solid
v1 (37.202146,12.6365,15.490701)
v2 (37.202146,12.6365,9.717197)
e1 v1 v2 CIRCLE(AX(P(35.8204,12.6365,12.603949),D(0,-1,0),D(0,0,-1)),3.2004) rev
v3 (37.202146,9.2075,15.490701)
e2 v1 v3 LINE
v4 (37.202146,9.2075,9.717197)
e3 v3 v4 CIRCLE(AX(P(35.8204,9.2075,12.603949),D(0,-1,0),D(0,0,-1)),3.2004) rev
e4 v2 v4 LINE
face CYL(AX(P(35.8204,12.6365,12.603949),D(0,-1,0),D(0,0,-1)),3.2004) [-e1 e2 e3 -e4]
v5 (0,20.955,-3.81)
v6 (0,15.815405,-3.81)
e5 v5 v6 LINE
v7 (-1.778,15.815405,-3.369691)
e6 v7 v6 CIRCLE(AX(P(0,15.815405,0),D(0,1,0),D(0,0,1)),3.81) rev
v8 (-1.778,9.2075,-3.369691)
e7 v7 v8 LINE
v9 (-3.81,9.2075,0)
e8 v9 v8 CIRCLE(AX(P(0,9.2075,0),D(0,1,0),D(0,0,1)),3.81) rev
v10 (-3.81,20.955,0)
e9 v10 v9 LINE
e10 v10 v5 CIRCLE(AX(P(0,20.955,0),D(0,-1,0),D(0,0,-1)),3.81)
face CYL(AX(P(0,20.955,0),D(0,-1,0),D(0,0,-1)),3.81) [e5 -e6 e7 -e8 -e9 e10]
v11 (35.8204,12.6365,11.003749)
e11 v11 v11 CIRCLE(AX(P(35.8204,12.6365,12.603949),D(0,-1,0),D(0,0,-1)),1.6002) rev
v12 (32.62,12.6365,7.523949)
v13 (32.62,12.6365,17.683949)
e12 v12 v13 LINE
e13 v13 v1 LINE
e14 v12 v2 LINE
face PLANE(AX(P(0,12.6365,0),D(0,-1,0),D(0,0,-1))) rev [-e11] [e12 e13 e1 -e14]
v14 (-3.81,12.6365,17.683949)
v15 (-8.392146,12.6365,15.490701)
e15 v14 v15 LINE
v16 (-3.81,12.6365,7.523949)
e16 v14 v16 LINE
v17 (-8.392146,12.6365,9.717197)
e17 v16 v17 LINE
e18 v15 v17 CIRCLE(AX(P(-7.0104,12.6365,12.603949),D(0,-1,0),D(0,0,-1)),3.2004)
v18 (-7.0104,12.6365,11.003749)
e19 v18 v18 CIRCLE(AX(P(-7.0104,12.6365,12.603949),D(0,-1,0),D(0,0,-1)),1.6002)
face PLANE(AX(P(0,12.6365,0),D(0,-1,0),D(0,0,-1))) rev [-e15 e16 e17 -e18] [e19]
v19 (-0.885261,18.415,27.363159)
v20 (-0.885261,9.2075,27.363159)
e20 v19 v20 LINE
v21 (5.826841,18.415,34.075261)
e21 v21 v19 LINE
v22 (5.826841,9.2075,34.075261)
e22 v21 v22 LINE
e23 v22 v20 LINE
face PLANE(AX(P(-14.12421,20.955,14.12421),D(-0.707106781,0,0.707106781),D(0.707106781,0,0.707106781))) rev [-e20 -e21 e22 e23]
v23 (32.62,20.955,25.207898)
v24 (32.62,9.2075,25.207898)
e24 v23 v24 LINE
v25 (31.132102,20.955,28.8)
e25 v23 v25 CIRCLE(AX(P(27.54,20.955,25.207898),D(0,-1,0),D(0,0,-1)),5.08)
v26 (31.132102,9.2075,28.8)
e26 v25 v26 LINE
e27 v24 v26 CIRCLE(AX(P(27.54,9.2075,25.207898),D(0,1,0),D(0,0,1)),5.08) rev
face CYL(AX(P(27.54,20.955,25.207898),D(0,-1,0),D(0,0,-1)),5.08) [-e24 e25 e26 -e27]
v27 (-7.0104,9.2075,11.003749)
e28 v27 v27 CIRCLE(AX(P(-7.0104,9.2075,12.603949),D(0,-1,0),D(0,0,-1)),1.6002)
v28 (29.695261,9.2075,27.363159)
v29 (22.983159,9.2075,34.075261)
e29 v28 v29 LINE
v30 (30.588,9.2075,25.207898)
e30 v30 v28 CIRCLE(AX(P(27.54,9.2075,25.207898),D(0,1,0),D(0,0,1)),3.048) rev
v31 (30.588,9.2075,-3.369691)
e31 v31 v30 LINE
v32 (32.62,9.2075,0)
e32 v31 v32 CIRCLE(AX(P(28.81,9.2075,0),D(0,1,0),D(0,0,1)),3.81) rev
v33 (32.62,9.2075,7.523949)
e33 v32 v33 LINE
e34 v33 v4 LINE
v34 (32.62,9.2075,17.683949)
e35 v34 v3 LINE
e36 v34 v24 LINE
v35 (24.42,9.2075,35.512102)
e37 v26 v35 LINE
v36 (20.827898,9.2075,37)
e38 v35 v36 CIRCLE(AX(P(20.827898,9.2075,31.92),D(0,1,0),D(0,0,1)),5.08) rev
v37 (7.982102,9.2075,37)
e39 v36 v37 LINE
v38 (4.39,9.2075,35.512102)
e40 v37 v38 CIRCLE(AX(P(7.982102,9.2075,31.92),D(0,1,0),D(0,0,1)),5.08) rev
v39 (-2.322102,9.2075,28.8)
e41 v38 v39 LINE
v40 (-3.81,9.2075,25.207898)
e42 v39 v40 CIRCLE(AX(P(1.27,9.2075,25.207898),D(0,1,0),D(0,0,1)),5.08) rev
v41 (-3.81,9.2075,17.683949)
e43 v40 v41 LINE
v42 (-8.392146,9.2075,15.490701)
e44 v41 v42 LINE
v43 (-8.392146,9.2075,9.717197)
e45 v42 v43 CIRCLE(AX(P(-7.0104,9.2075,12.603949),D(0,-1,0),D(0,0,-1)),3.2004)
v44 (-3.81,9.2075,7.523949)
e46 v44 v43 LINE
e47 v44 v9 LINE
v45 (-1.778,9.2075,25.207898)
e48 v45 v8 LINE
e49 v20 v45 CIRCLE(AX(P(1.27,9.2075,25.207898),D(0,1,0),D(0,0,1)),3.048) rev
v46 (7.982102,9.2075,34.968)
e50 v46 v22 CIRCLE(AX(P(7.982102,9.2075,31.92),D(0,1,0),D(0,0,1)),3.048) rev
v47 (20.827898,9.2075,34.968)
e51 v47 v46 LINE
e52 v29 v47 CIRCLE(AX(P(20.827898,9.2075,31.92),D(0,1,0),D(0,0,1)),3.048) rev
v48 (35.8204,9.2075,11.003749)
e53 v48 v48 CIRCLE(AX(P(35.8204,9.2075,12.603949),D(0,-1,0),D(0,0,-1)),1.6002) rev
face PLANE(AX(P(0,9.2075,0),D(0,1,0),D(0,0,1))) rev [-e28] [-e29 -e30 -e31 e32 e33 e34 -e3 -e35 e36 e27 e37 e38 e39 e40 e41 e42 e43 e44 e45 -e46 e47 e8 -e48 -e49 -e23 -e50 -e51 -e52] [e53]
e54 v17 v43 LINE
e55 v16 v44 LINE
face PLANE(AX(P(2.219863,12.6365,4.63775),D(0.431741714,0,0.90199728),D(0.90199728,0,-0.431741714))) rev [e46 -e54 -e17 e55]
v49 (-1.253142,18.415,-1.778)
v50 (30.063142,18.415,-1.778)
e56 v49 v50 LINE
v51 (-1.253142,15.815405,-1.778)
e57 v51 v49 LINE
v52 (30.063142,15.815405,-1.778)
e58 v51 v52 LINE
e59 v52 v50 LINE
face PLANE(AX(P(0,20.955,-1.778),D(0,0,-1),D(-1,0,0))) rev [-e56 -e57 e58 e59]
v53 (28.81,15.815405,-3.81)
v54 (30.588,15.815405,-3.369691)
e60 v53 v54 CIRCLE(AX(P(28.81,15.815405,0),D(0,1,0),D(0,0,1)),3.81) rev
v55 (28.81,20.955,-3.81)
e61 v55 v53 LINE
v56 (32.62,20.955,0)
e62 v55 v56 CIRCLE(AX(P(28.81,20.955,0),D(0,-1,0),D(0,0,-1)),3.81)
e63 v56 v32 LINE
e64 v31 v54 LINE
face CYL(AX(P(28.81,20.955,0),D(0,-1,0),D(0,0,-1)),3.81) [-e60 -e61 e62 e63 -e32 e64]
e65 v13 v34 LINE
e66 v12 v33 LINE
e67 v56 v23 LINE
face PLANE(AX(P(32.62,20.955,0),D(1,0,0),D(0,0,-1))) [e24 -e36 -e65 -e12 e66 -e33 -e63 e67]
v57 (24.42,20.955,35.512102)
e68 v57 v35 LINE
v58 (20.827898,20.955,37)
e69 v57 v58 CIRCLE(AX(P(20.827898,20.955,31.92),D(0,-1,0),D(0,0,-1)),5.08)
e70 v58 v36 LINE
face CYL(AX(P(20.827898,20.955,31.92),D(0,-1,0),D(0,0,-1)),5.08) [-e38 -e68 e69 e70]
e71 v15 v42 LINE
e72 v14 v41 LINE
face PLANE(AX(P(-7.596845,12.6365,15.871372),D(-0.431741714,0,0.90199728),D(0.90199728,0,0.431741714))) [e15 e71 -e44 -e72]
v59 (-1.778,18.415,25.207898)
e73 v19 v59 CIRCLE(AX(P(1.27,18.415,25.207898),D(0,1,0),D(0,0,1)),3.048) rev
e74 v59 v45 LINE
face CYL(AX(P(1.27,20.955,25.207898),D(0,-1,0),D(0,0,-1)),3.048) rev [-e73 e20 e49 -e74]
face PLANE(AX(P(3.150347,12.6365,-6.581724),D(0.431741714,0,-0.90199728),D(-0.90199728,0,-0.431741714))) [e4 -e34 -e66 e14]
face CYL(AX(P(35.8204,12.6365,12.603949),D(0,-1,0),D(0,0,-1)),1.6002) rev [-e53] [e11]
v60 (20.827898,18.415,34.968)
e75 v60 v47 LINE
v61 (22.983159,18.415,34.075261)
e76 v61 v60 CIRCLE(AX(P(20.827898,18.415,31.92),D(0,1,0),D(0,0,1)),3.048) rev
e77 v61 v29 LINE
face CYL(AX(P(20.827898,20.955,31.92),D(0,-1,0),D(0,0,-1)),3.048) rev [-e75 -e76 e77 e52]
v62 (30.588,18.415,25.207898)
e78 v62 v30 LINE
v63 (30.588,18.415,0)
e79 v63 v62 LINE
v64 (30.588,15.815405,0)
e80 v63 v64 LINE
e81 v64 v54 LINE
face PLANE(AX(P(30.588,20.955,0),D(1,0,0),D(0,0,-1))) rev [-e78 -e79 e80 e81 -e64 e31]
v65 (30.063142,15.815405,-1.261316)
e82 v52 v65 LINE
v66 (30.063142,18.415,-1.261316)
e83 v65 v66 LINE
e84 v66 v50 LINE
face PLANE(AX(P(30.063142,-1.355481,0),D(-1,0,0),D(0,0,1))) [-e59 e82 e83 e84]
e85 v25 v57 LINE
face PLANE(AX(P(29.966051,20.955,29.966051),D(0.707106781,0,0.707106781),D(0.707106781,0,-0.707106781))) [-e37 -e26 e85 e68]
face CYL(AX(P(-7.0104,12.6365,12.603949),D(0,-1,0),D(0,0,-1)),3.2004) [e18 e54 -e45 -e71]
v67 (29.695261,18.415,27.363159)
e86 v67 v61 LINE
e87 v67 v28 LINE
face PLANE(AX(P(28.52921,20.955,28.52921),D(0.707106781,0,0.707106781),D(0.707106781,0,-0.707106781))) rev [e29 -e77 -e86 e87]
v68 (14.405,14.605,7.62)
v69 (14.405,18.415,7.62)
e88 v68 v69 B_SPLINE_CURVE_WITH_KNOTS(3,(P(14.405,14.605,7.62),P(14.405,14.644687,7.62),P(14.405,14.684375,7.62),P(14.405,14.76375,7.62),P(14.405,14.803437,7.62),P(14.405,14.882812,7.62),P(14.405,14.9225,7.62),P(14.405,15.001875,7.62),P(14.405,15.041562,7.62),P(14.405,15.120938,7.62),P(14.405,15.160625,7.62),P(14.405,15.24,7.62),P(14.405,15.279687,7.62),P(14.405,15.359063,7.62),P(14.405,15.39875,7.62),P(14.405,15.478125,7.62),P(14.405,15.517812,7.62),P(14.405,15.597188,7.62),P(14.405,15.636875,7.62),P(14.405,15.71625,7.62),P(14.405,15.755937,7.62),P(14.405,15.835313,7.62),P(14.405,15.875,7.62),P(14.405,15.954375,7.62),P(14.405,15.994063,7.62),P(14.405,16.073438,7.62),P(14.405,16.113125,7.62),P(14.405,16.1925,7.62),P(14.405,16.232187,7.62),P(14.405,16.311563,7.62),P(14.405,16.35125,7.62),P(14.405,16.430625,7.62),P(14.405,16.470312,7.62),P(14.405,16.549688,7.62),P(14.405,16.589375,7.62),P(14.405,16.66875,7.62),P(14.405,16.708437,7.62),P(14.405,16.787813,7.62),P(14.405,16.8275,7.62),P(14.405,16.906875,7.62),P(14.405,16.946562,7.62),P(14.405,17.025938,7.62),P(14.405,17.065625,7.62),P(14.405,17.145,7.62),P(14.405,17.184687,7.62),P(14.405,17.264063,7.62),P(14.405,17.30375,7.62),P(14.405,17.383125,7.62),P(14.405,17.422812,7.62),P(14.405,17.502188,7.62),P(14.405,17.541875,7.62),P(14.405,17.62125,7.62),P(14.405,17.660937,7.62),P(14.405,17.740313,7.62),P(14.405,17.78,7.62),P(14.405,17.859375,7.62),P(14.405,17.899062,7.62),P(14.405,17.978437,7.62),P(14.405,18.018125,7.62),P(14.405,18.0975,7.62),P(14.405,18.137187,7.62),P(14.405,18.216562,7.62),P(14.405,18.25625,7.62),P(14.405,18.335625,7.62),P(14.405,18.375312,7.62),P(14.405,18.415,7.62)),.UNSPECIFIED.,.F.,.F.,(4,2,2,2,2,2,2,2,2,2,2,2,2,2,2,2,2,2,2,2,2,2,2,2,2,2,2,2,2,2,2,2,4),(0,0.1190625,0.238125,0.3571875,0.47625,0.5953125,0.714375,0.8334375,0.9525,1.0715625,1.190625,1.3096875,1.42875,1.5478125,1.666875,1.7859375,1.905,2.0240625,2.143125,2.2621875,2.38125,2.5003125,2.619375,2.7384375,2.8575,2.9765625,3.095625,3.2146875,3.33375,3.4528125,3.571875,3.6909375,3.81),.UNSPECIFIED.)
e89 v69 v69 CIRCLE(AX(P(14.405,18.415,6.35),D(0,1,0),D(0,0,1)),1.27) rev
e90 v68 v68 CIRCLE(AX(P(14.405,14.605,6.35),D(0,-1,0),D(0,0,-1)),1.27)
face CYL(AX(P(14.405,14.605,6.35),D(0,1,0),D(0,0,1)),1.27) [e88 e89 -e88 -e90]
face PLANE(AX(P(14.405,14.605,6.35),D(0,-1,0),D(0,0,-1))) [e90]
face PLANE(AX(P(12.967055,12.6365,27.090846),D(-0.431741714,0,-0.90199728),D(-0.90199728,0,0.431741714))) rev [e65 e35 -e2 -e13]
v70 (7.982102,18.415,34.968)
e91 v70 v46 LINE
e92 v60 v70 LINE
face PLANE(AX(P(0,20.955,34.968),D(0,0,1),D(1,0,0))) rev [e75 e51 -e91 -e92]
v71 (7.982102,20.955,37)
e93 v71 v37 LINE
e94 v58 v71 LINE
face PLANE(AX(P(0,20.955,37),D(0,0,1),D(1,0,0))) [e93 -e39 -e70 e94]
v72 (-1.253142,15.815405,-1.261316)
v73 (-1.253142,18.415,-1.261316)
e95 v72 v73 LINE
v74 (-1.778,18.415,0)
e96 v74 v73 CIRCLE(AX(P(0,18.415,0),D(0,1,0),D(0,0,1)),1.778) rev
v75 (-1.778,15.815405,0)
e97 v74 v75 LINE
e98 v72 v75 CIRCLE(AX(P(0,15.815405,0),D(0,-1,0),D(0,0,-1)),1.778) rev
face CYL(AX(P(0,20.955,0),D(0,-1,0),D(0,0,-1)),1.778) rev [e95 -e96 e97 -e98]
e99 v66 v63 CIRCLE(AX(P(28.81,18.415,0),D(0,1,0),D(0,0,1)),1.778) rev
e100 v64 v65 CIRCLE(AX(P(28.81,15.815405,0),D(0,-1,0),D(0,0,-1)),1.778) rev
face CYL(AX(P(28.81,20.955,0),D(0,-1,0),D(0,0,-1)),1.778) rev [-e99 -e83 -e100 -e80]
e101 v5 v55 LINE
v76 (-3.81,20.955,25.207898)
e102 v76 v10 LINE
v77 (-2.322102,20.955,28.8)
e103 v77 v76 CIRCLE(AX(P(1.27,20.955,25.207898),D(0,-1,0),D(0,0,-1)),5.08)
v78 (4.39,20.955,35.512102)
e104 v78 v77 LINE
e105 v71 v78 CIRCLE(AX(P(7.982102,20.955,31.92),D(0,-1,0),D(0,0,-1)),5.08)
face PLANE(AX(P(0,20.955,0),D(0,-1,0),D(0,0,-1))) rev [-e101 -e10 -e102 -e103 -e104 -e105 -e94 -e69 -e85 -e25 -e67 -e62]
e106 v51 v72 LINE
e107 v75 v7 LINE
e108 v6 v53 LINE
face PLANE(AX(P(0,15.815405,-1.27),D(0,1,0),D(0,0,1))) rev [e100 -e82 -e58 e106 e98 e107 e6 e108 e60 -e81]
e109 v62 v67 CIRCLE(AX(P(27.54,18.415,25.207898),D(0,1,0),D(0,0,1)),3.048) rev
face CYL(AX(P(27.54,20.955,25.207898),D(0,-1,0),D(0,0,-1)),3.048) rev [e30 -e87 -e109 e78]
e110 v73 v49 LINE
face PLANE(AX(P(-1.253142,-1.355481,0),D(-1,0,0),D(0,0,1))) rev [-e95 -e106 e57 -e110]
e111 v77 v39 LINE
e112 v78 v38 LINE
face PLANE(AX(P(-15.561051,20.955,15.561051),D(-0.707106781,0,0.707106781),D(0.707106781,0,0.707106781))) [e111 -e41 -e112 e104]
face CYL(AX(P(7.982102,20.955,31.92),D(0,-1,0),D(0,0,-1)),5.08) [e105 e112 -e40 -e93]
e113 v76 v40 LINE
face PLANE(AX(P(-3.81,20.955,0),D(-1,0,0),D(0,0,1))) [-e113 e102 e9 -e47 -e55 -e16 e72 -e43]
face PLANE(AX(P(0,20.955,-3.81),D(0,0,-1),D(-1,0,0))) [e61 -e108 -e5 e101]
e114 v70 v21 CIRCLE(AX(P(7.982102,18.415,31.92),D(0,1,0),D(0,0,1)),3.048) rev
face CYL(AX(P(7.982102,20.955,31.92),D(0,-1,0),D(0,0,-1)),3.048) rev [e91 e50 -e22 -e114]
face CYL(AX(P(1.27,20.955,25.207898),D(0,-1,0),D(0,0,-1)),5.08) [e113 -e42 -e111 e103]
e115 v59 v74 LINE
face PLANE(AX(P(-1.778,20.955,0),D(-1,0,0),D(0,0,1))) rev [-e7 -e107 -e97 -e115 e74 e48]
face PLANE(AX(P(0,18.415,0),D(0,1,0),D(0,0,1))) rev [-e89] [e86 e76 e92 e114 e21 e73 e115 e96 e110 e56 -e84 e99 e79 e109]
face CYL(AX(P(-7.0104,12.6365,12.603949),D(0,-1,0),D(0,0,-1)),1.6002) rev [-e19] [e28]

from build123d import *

# Parameters (mm, degrees)
BOSS_EXTRUDE1_DEPTH     = 2.54
BOSS_EXTRUDE2_START     = -23.495
BOSS_EXTRUDE2_DEPTH     = 23.495
CUT_EXTRUDE2_DEPTH      = 20.955
BOSS_EXTRUDE3_DEPTH     = 2.54
SKETCH11_R              = 1.27
BOSS_EXTRUDE4_DEPTH     = 2.54
CUT_EXTRUDE3_DEPTH      = 2.54
CUT_EXTRUDE4_DEPTH      = 2.54
CUT_EXTRUDE4_DEPTH_BACK = 2.54
SKETCH15_W              = 0.800537806
SKETCH15_H              = 10.431424645
SPLIT1_START            = -2.54
SPLIT1_DEPTH            = 11.7475
SKETCH16_R              = 3.2004
SKETCH16_R_2            = 1.6002
SKETCH16_R_3            = 1.27
BOSS_EXTRUDE5_DEPTH     = 3.429
SKETCH21_R              = 1.27
BOSS_EXTRUDE6_DEPTH     = 3.81


# Read off the part's stored shape, not the designer's step: Split1
with BuildPart() as part:
    # Sketch1 → Boss-Extrude1 (new body)
    # profile 1 of 2: a face of its own
    with BuildSketch(Plane(origin=(0, 0, 0), x_dir=(1, 0, 0), z_dir=(0, 1, 0))):
        with BuildLine():
            Line((-1.778, 0), (-1.778, -25.207897552))
            ThreePointArc((-1.778, -25.207897552), (-1.545984815, -26.374316653), (-0.885261469, -27.363159021))
            Line((-0.885261469, -27.363159021), (5.826840979, -34.075261469))
            ThreePointArc((5.826840979, -34.075261469), (6.815683347, -34.735984815), (7.982102448, -34.968))
            Line((7.982102448, -34.968), (20.827897552, -34.968))
            ThreePointArc((20.827897552, -34.968), (21.994316653, -34.735984815), (22.983159021, -34.075261469))
            Line((22.983159021, -34.075261469), (29.695261469, -27.363159021))
            ThreePointArc((29.695261469, -27.363159021), (30.355984815, -26.374316653), (30.588, -25.207897552))
            Line((30.588, -25.207897552), (30.588, 0))
            ThreePointArc((30.588, 0), (30.067235857, 1.257235857), (28.81, 1.778))
            Line((28.81, 1.778), (0, 1.778))
            ThreePointArc((0, 1.778), (-1.257235857, 1.257235857), (-1.778, 0))
        make_face()
        with BuildLine():
            ThreePointArc((0, 1.27), (-0.898025612, 0.898025612), (-1.27, 0))
            Line((-1.27, 0), (-1.27, -25.207897552))
            ThreePointArc((-1.27, -25.207897552), (-1.076654013, -26.17991347), (-0.526051224, -27.003948776))
            Line((-0.526051224, -27.003948776), (6.186051224, -33.716051224))
            ThreePointArc((6.186051224, -33.716051224), (7.01008653, -34.266654013), (7.982102448, -34.46))
            Line((7.982102448, -34.46), (20.827897552, -34.46))
            ThreePointArc((20.827897552, -34.46), (21.79991347, -34.266654013), (22.623948776, -33.716051224))
            Line((22.623948776, -33.716051224), (29.336051224, -27.003948776))
            ThreePointArc((29.336051224, -27.003948776), (29.886654013, -26.17991347), (30.08, -25.207897552))
            Line((30.08, -25.207897552), (30.08, 0))
            ThreePointArc((30.08, 0), (29.708025612, 0.898025612), (28.81, 1.27))
            Line((28.81, 1.27), (0, 1.27))
        make_face(mode=Mode.SUBTRACT)
    # profile 2 of 2: a face of its own
    with BuildSketch(Plane(origin=(0, 0, 0), x_dir=(1, 0, 0), z_dir=(0, 1, 0))):
        with BuildLine():
            Line((28.81, 1.27), (0, 1.27))
            ThreePointArc((0, 1.27), (-0.898025612, 0.898025612), (-1.27, 0))
            Line((-1.27, 0), (-1.27, -25.207897552))
            ThreePointArc((-1.27, -25.207897552), (-1.076654013, -26.17991347), (-0.526051224, -27.003948776))
            Line((-0.526051224, -27.003948776), (6.186051224, -33.716051224))
            ThreePointArc((6.186051224, -33.716051224), (7.01008653, -34.266654013), (7.982102448, -34.46))
            Line((7.982102448, -34.46), (20.827897552, -34.46))
            ThreePointArc((20.827897552, -34.46), (21.79991347, -34.266654013), (22.623948776, -33.716051224))
            Line((22.623948776, -33.716051224), (29.336051224, -27.003948776))
            ThreePointArc((29.336051224, -27.003948776), (29.886654013, -26.17991347), (30.08, -25.207897552))
            Line((30.08, -25.207897552), (30.08, 0))
            ThreePointArc((30.08, 0), (29.708025612, 0.898025612), (28.81, 1.27))
        make_face()
    extrude(amount=-BOSS_EXTRUDE1_DEPTH)

    # Sketch2 → Boss-Extrude2 (add)
    with BuildSketch(Plane.XZ.offset(2.54).offset(BOSS_EXTRUDE2_START)):
        with BuildLine():
            Line((-3.81, 25.207897552), (-3.81, 0))
            ThreePointArc((-3.81, 0), (-2.694076836, -2.694076836), (0, -3.81))
            Line((0, -3.81), (28.81, -3.81))
            ThreePointArc((28.81, -3.81), (31.504076836, -2.694076836), (32.62, 0))
            Line((32.62, 0), (32.62, 25.207897552))
            ThreePointArc((32.62, 25.207897552), (32.233308025, 27.151929388), (31.132102448, 28.8))
            Line((31.132102448, 28.8), (24.42, 35.512102448))
            ThreePointArc((24.42, 35.512102448), (22.771929388, 36.613308025), (20.827897552, 37))
            Line((20.827897552, 37), (7.982102448, 37))
            ThreePointArc((7.982102448, 37), (6.038070612, 36.613308025), (4.39, 35.512102448))
            Line((4.39, 35.512102448), (-2.322102448, 28.8))
            ThreePointArc((-2.322102448, 28.8), (-3.423308025, 27.151929388), (-3.81, 25.207897552))
        make_face()
        with BuildLine():
            ThreePointArc((30.588, 25.207897552), (30.355984815, 26.374316653), (29.695261469, 27.363159021))
            Line((29.695261469, 27.363159021), (22.983159021, 34.075261469))
            ThreePointArc((22.983159021, 34.075261469), (21.994316653, 34.735984815), (20.827897552, 34.968))
            Line((20.827897552, 34.968), (7.982102448, 34.968))
            ThreePointArc((7.982102448, 34.968), (6.815683347, 34.735984815), (5.826840979, 34.075261469))
            Line((5.826840979, 34.075261469), (-0.885261469, 27.363159021))
            ThreePointArc((-0.885261469, 27.363159021), (-1.545984815, 26.374316653), (-1.778, 25.207897552))
            Line((-1.778, 25.207897552), (-1.778, 0))
            ThreePointArc((-1.778, 0), (-1.257235857, -1.257235857), (0, -1.778))
            Line((0, -1.778), (28.81, -1.778))
            ThreePointArc((28.81, -1.778), (30.067235857, -1.257235857), (30.588, 0))
            Line((30.588, 0), (30.588, 25.207897552))
        make_face(mode=Mode.SUBTRACT)
    extrude(amount=BOSS_EXTRUDE2_DEPTH)

    # Sketch9 → Cut-Extrude2 (cut)
    with BuildSketch(Plane(origin=(0, 20.955, 0), x_dir=(1, 0, 0), z_dir=(0, 1, 0))):
        with BuildLine():
            Line((-1.253142306, 1.778), (-1.253142306, 1.261316122))
            ThreePointArc((-1.253142306, 1.261316122), (-1.130998818, 1.371905855), (-0.999142306, 1.470713654))
            Line((-0.999142306, 1.470713654), (-0.999142306, 1.778))
            Line((-0.999142306, 1.778), (-1.253142306, 1.778))
        make_face()
        with BuildLine():
            Line((-0.999142306, 1.778), (-0.999142306, 1.470713654))
            ThreePointArc((-0.999142306, 1.470713654), (-0.522663909, 1.699442979), (0, 1.778))
            Line((0, 1.778), (-0.999142306, 1.778))
        make_face()
        with BuildLine():
            ThreePointArc((28.81, 1.778), (29.333159527, 1.699290472), (29.81, 1.470130606))
            Line((29.81, 1.470130606), (29.81, 1.778))
            Line((29.81, 1.778), (28.81, 1.778))
        make_face()
        with BuildLine():
            ThreePointArc((29.81, 1.470130606), (29.941398884, 1.371575942), (30.063142306, 1.261316122))
            Line((30.063142306, 1.261316122), (30.063142306, 1.778))
            Line((30.063142306, 1.778), (29.81, 1.778))
            Line((29.81, 1.778), (29.81, 1.470130606))
        make_face()
    extrude(amount=-CUT_EXTRUDE2_DEPTH, mode=Mode.SUBTRACT)

    # Sketch10 → Boss-Extrude3 (add)
    with BuildSketch(Plane(origin=(0, 20.955, 0), x_dir=(1, 0, 0), z_dir=(0, 1, 0))):
        with BuildLine():
            Line((-3.81, 0), (-3.81, -25.207897552))
            ThreePointArc((-3.81, -25.207897552), (-3.423308025, -27.151929388), (-2.322102448, -28.8))
            Line((-2.322102448, -28.8), (4.39, -35.512102448))
            ThreePointArc((4.39, -35.512102448), (6.038070612, -36.613308025), (7.982102448, -37))
            Line((7.982102448, -37), (20.827897552, -37))
            ThreePointArc((20.827897552, -37), (22.771929388, -36.613308025), (24.42, -35.512102448))
            Line((24.42, -35.512102448), (31.132102448, -28.8))
            ThreePointArc((31.132102448, -28.8), (32.233308025, -27.151929388), (32.62, -25.207897552))
            Line((32.62, -25.207897552), (32.62, 0))
            ThreePointArc((32.62, 0), (31.504076836, 2.694076836), (28.81, 3.81))
            Line((28.81, 3.81), (0, 3.81))
            ThreePointArc((0, 3.81), (-2.694076836, 2.694076836), (-3.81, 0))
        make_face()
    extrude(amount=-BOSS_EXTRUDE3_DEPTH)

    # Sketch11 → Boss-Extrude4 (add)
    with BuildSketch(Plane(origin=(0, 0, 0), x_dir=(1, 0, 0), z_dir=(0, 1, 0))):
        with Locations(Location((2.371622665, -3.626580703, 0), (0, 0, 270))):
            Circle(SKETCH11_R)
        with Locations(Location((26.438377335, -3.626580703, 0), (0, 0, 270))):
            Circle(SKETCH11_R)
        with Locations(Location((2.371622665, -26.04201004, 0), (0, 0, 270))):
            Circle(SKETCH11_R)
        with Locations(Location((26.438377335, -26.04201004, 0), (0, 0, 270))):
            Circle(SKETCH11_R)
    extrude(amount=BOSS_EXTRUDE4_DEPTH)

    # Sketch8 → Cut-Extrude3 (cut)
    with BuildSketch(Plane(origin=(0, 0, -3.81), x_dir=(-1, 0, 0), z_dir=(0, 0, -1))):
        with BuildLine():
            ThreePointArc((-29.81, 5.625), (-29.804353285, 5.503964576), (-29.787462194, 5.383980617))
            Line((-29.787462194, 5.383980617), (0.977462194, 5.383980617))
            ThreePointArc((0.977462194, 5.383980617), (0.994353285, 5.503964576), (1, 5.625))
            Line((1, 5.625), (1, 15.575))
            ThreePointArc((1, 15.575), (0.994382339, 15.695724314), (0.977577908, 15.815405262))
            Line((0.977577908, 15.815405262), (-29.787577908, 15.815405262))
            ThreePointArc((-29.787577908, 15.815405262), (-29.804382339, 15.695724314), (-29.81, 15.575))
            Line((-29.81, 15.575), (-29.81, 5.625))
        make_face()
    extrude(amount=-CUT_EXTRUDE3_DEPTH, mode=Mode.SUBTRACT)

    # Sketch15 → Cut-Extrude4 (cut, two sides: drawn at the far end of the back side and taken through both)
    with BuildSketch(Plane.XY.offset(-1.778).offset(-CUT_EXTRUDE4_DEPTH_BACK)):
        with Locations((-1.377731097, 10.59969294)):
            Rectangle(SKETCH15_W, SKETCH15_H)
        with Locations((30.187731097, 10.59969294)):
            Rectangle(SKETCH15_W, SKETCH15_H)
    extrude(amount=CUT_EXTRUDE4_DEPTH + CUT_EXTRUDE4_DEPTH_BACK, mode=Mode.SUBTRACT)

    # Split1 outline → Split1 (cut)
    with BuildSketch(Plane(origin=(0, 0, 0), x_dir=(1, 0, 0), z_dir=(0, 1, 0)).offset(SPLIT1_START)):
        with BuildLine():
            Line((28.81, 3.81), (0, 3.81))
            ThreePointArc((0, 3.81), (-2.694076836, 2.694076836), (-3.81, 0))
            Line((-3.81, 0), (-3.81, -25.207897552))
            ThreePointArc((-3.81, -25.207897552), (-3.423308025, -27.151929388), (-2.322102448, -28.8))
            Line((-2.322102448, -28.8), (4.39, -35.512102448))
            ThreePointArc((4.39, -35.512102448), (6.038070612, -36.613308025), (7.982102448, -37))
            Line((7.982102448, -37), (20.827897552, -37))
            ThreePointArc((20.827897552, -37), (22.771929388, -36.613308025), (24.42, -35.512102448))
            Line((24.42, -35.512102448), (31.132102448, -28.8))
            ThreePointArc((31.132102448, -28.8), (32.233308025, -27.151929388), (32.62, -25.207897552))
            Line((32.62, -25.207897552), (32.62, 0))
            ThreePointArc((32.62, 0), (31.504076836, 2.694076836), (28.81, 3.81))
        make_face()
    extrude(amount=SPLIT1_DEPTH, mode=Mode.SUBTRACT)

    # Sketch16 → Boss-Extrude5 (add)
    # profile 1 of 7: a face of its own
    with BuildSketch(Plane.XZ.offset(-9.2075)):
        with BuildLine():
            Line((-3.81, 12.603948776), (-3.81, 17.683948776))
            Line((-3.81, 17.683948776), (-8.392146181, 15.49070087))
            ThreePointArc((-8.392146181, 15.49070087), (-5.304466285, 15.31178007), (-3.81, 12.603948776))
        make_face()
    # profile 2 of 7: a face of its own
    with BuildSketch(Plane.XZ.offset(-9.2075)):
        with Locations((-7.0104, 12.603948776)):
            Circle(SKETCH16_R)
        with Locations(Location((-7.0104, 12.603948776, 0), (0, 0, 270))):
            Circle(SKETCH16_R_2, mode=Mode.SUBTRACT)
    # profile 3 of 7: a face of its own
    with BuildSketch(Plane.XZ.offset(-9.2075)):
        with BuildLine():
            Line((-3.81, 7.523948776), (-3.81, 12.603948776))
            ThreePointArc((-3.81, 12.603948776), (-5.304466285, 9.896117481), (-8.392146181, 9.717196682))
            Line((-8.392146181, 9.717196682), (-3.81, 7.523948776))
        make_face()
    # profile 4 of 7: a face of its own
    with BuildSketch(Plane.XZ.offset(-9.2075)):
        with BuildLine():
            Line((32.62, 12.603948776), (32.62, 7.523948776))
            Line((32.62, 7.523948776), (37.202146181, 9.717196682))
            ThreePointArc((37.202146181, 9.717196682), (34.114466285, 9.896117481), (32.62, 12.603948776))
        make_face()
    # profile 5 of 7: a face of its own
    with BuildSketch(Plane.XZ.offset(-9.2075)):
        with Locations((35.8204, 12.603948776)):
            Circle(SKETCH16_R)
        with Locations(Location((35.8204, 12.603948776, 0), (0, 0, 270))):
            Circle(SKETCH16_R_2, mode=Mode.SUBTRACT)
    # profile 6 of 7: a face of its own
    with BuildSketch(Plane.XZ.offset(-9.2075)):
        with BuildLine():
            Line((32.62, 17.683948776), (32.62, 12.603948776))
            ThreePointArc((32.62, 12.603948776), (34.114466285, 15.31178007), (37.202146181, 15.49070087))
            Line((37.202146181, 15.49070087), (32.62, 17.683948776))
        make_face()
    # profile 7 of 7: a face of its own
    with BuildSketch(Plane.XZ.offset(-9.2075)):
        with Locations((35.8204, 12.603948776)):
            Circle(SKETCH16_R_3)
    extrude(amount=-BOSS_EXTRUDE5_DEPTH)


with BuildPart() as boss_extrude5_kept_piece:
    # of the separate pieces the step leaves, the one the design keeps (boss_extrude5_pieces_kept)
    add(part.part.solids().sort_by_distance((-3.81, 20.955, 0))[0])

    # Sketch21 → Boss-Extrude6 (add)
    with BuildSketch(Plane.XZ.offset(-18.415)):
        with Locations(Location((14.405, 6.35, 0), (0, 0, 90))):
            Circle(SKETCH21_R)
    extrude(amount=BOSS_EXTRUDE6_DEPTH)


solid = boss_extrude5_kept_piece.part
